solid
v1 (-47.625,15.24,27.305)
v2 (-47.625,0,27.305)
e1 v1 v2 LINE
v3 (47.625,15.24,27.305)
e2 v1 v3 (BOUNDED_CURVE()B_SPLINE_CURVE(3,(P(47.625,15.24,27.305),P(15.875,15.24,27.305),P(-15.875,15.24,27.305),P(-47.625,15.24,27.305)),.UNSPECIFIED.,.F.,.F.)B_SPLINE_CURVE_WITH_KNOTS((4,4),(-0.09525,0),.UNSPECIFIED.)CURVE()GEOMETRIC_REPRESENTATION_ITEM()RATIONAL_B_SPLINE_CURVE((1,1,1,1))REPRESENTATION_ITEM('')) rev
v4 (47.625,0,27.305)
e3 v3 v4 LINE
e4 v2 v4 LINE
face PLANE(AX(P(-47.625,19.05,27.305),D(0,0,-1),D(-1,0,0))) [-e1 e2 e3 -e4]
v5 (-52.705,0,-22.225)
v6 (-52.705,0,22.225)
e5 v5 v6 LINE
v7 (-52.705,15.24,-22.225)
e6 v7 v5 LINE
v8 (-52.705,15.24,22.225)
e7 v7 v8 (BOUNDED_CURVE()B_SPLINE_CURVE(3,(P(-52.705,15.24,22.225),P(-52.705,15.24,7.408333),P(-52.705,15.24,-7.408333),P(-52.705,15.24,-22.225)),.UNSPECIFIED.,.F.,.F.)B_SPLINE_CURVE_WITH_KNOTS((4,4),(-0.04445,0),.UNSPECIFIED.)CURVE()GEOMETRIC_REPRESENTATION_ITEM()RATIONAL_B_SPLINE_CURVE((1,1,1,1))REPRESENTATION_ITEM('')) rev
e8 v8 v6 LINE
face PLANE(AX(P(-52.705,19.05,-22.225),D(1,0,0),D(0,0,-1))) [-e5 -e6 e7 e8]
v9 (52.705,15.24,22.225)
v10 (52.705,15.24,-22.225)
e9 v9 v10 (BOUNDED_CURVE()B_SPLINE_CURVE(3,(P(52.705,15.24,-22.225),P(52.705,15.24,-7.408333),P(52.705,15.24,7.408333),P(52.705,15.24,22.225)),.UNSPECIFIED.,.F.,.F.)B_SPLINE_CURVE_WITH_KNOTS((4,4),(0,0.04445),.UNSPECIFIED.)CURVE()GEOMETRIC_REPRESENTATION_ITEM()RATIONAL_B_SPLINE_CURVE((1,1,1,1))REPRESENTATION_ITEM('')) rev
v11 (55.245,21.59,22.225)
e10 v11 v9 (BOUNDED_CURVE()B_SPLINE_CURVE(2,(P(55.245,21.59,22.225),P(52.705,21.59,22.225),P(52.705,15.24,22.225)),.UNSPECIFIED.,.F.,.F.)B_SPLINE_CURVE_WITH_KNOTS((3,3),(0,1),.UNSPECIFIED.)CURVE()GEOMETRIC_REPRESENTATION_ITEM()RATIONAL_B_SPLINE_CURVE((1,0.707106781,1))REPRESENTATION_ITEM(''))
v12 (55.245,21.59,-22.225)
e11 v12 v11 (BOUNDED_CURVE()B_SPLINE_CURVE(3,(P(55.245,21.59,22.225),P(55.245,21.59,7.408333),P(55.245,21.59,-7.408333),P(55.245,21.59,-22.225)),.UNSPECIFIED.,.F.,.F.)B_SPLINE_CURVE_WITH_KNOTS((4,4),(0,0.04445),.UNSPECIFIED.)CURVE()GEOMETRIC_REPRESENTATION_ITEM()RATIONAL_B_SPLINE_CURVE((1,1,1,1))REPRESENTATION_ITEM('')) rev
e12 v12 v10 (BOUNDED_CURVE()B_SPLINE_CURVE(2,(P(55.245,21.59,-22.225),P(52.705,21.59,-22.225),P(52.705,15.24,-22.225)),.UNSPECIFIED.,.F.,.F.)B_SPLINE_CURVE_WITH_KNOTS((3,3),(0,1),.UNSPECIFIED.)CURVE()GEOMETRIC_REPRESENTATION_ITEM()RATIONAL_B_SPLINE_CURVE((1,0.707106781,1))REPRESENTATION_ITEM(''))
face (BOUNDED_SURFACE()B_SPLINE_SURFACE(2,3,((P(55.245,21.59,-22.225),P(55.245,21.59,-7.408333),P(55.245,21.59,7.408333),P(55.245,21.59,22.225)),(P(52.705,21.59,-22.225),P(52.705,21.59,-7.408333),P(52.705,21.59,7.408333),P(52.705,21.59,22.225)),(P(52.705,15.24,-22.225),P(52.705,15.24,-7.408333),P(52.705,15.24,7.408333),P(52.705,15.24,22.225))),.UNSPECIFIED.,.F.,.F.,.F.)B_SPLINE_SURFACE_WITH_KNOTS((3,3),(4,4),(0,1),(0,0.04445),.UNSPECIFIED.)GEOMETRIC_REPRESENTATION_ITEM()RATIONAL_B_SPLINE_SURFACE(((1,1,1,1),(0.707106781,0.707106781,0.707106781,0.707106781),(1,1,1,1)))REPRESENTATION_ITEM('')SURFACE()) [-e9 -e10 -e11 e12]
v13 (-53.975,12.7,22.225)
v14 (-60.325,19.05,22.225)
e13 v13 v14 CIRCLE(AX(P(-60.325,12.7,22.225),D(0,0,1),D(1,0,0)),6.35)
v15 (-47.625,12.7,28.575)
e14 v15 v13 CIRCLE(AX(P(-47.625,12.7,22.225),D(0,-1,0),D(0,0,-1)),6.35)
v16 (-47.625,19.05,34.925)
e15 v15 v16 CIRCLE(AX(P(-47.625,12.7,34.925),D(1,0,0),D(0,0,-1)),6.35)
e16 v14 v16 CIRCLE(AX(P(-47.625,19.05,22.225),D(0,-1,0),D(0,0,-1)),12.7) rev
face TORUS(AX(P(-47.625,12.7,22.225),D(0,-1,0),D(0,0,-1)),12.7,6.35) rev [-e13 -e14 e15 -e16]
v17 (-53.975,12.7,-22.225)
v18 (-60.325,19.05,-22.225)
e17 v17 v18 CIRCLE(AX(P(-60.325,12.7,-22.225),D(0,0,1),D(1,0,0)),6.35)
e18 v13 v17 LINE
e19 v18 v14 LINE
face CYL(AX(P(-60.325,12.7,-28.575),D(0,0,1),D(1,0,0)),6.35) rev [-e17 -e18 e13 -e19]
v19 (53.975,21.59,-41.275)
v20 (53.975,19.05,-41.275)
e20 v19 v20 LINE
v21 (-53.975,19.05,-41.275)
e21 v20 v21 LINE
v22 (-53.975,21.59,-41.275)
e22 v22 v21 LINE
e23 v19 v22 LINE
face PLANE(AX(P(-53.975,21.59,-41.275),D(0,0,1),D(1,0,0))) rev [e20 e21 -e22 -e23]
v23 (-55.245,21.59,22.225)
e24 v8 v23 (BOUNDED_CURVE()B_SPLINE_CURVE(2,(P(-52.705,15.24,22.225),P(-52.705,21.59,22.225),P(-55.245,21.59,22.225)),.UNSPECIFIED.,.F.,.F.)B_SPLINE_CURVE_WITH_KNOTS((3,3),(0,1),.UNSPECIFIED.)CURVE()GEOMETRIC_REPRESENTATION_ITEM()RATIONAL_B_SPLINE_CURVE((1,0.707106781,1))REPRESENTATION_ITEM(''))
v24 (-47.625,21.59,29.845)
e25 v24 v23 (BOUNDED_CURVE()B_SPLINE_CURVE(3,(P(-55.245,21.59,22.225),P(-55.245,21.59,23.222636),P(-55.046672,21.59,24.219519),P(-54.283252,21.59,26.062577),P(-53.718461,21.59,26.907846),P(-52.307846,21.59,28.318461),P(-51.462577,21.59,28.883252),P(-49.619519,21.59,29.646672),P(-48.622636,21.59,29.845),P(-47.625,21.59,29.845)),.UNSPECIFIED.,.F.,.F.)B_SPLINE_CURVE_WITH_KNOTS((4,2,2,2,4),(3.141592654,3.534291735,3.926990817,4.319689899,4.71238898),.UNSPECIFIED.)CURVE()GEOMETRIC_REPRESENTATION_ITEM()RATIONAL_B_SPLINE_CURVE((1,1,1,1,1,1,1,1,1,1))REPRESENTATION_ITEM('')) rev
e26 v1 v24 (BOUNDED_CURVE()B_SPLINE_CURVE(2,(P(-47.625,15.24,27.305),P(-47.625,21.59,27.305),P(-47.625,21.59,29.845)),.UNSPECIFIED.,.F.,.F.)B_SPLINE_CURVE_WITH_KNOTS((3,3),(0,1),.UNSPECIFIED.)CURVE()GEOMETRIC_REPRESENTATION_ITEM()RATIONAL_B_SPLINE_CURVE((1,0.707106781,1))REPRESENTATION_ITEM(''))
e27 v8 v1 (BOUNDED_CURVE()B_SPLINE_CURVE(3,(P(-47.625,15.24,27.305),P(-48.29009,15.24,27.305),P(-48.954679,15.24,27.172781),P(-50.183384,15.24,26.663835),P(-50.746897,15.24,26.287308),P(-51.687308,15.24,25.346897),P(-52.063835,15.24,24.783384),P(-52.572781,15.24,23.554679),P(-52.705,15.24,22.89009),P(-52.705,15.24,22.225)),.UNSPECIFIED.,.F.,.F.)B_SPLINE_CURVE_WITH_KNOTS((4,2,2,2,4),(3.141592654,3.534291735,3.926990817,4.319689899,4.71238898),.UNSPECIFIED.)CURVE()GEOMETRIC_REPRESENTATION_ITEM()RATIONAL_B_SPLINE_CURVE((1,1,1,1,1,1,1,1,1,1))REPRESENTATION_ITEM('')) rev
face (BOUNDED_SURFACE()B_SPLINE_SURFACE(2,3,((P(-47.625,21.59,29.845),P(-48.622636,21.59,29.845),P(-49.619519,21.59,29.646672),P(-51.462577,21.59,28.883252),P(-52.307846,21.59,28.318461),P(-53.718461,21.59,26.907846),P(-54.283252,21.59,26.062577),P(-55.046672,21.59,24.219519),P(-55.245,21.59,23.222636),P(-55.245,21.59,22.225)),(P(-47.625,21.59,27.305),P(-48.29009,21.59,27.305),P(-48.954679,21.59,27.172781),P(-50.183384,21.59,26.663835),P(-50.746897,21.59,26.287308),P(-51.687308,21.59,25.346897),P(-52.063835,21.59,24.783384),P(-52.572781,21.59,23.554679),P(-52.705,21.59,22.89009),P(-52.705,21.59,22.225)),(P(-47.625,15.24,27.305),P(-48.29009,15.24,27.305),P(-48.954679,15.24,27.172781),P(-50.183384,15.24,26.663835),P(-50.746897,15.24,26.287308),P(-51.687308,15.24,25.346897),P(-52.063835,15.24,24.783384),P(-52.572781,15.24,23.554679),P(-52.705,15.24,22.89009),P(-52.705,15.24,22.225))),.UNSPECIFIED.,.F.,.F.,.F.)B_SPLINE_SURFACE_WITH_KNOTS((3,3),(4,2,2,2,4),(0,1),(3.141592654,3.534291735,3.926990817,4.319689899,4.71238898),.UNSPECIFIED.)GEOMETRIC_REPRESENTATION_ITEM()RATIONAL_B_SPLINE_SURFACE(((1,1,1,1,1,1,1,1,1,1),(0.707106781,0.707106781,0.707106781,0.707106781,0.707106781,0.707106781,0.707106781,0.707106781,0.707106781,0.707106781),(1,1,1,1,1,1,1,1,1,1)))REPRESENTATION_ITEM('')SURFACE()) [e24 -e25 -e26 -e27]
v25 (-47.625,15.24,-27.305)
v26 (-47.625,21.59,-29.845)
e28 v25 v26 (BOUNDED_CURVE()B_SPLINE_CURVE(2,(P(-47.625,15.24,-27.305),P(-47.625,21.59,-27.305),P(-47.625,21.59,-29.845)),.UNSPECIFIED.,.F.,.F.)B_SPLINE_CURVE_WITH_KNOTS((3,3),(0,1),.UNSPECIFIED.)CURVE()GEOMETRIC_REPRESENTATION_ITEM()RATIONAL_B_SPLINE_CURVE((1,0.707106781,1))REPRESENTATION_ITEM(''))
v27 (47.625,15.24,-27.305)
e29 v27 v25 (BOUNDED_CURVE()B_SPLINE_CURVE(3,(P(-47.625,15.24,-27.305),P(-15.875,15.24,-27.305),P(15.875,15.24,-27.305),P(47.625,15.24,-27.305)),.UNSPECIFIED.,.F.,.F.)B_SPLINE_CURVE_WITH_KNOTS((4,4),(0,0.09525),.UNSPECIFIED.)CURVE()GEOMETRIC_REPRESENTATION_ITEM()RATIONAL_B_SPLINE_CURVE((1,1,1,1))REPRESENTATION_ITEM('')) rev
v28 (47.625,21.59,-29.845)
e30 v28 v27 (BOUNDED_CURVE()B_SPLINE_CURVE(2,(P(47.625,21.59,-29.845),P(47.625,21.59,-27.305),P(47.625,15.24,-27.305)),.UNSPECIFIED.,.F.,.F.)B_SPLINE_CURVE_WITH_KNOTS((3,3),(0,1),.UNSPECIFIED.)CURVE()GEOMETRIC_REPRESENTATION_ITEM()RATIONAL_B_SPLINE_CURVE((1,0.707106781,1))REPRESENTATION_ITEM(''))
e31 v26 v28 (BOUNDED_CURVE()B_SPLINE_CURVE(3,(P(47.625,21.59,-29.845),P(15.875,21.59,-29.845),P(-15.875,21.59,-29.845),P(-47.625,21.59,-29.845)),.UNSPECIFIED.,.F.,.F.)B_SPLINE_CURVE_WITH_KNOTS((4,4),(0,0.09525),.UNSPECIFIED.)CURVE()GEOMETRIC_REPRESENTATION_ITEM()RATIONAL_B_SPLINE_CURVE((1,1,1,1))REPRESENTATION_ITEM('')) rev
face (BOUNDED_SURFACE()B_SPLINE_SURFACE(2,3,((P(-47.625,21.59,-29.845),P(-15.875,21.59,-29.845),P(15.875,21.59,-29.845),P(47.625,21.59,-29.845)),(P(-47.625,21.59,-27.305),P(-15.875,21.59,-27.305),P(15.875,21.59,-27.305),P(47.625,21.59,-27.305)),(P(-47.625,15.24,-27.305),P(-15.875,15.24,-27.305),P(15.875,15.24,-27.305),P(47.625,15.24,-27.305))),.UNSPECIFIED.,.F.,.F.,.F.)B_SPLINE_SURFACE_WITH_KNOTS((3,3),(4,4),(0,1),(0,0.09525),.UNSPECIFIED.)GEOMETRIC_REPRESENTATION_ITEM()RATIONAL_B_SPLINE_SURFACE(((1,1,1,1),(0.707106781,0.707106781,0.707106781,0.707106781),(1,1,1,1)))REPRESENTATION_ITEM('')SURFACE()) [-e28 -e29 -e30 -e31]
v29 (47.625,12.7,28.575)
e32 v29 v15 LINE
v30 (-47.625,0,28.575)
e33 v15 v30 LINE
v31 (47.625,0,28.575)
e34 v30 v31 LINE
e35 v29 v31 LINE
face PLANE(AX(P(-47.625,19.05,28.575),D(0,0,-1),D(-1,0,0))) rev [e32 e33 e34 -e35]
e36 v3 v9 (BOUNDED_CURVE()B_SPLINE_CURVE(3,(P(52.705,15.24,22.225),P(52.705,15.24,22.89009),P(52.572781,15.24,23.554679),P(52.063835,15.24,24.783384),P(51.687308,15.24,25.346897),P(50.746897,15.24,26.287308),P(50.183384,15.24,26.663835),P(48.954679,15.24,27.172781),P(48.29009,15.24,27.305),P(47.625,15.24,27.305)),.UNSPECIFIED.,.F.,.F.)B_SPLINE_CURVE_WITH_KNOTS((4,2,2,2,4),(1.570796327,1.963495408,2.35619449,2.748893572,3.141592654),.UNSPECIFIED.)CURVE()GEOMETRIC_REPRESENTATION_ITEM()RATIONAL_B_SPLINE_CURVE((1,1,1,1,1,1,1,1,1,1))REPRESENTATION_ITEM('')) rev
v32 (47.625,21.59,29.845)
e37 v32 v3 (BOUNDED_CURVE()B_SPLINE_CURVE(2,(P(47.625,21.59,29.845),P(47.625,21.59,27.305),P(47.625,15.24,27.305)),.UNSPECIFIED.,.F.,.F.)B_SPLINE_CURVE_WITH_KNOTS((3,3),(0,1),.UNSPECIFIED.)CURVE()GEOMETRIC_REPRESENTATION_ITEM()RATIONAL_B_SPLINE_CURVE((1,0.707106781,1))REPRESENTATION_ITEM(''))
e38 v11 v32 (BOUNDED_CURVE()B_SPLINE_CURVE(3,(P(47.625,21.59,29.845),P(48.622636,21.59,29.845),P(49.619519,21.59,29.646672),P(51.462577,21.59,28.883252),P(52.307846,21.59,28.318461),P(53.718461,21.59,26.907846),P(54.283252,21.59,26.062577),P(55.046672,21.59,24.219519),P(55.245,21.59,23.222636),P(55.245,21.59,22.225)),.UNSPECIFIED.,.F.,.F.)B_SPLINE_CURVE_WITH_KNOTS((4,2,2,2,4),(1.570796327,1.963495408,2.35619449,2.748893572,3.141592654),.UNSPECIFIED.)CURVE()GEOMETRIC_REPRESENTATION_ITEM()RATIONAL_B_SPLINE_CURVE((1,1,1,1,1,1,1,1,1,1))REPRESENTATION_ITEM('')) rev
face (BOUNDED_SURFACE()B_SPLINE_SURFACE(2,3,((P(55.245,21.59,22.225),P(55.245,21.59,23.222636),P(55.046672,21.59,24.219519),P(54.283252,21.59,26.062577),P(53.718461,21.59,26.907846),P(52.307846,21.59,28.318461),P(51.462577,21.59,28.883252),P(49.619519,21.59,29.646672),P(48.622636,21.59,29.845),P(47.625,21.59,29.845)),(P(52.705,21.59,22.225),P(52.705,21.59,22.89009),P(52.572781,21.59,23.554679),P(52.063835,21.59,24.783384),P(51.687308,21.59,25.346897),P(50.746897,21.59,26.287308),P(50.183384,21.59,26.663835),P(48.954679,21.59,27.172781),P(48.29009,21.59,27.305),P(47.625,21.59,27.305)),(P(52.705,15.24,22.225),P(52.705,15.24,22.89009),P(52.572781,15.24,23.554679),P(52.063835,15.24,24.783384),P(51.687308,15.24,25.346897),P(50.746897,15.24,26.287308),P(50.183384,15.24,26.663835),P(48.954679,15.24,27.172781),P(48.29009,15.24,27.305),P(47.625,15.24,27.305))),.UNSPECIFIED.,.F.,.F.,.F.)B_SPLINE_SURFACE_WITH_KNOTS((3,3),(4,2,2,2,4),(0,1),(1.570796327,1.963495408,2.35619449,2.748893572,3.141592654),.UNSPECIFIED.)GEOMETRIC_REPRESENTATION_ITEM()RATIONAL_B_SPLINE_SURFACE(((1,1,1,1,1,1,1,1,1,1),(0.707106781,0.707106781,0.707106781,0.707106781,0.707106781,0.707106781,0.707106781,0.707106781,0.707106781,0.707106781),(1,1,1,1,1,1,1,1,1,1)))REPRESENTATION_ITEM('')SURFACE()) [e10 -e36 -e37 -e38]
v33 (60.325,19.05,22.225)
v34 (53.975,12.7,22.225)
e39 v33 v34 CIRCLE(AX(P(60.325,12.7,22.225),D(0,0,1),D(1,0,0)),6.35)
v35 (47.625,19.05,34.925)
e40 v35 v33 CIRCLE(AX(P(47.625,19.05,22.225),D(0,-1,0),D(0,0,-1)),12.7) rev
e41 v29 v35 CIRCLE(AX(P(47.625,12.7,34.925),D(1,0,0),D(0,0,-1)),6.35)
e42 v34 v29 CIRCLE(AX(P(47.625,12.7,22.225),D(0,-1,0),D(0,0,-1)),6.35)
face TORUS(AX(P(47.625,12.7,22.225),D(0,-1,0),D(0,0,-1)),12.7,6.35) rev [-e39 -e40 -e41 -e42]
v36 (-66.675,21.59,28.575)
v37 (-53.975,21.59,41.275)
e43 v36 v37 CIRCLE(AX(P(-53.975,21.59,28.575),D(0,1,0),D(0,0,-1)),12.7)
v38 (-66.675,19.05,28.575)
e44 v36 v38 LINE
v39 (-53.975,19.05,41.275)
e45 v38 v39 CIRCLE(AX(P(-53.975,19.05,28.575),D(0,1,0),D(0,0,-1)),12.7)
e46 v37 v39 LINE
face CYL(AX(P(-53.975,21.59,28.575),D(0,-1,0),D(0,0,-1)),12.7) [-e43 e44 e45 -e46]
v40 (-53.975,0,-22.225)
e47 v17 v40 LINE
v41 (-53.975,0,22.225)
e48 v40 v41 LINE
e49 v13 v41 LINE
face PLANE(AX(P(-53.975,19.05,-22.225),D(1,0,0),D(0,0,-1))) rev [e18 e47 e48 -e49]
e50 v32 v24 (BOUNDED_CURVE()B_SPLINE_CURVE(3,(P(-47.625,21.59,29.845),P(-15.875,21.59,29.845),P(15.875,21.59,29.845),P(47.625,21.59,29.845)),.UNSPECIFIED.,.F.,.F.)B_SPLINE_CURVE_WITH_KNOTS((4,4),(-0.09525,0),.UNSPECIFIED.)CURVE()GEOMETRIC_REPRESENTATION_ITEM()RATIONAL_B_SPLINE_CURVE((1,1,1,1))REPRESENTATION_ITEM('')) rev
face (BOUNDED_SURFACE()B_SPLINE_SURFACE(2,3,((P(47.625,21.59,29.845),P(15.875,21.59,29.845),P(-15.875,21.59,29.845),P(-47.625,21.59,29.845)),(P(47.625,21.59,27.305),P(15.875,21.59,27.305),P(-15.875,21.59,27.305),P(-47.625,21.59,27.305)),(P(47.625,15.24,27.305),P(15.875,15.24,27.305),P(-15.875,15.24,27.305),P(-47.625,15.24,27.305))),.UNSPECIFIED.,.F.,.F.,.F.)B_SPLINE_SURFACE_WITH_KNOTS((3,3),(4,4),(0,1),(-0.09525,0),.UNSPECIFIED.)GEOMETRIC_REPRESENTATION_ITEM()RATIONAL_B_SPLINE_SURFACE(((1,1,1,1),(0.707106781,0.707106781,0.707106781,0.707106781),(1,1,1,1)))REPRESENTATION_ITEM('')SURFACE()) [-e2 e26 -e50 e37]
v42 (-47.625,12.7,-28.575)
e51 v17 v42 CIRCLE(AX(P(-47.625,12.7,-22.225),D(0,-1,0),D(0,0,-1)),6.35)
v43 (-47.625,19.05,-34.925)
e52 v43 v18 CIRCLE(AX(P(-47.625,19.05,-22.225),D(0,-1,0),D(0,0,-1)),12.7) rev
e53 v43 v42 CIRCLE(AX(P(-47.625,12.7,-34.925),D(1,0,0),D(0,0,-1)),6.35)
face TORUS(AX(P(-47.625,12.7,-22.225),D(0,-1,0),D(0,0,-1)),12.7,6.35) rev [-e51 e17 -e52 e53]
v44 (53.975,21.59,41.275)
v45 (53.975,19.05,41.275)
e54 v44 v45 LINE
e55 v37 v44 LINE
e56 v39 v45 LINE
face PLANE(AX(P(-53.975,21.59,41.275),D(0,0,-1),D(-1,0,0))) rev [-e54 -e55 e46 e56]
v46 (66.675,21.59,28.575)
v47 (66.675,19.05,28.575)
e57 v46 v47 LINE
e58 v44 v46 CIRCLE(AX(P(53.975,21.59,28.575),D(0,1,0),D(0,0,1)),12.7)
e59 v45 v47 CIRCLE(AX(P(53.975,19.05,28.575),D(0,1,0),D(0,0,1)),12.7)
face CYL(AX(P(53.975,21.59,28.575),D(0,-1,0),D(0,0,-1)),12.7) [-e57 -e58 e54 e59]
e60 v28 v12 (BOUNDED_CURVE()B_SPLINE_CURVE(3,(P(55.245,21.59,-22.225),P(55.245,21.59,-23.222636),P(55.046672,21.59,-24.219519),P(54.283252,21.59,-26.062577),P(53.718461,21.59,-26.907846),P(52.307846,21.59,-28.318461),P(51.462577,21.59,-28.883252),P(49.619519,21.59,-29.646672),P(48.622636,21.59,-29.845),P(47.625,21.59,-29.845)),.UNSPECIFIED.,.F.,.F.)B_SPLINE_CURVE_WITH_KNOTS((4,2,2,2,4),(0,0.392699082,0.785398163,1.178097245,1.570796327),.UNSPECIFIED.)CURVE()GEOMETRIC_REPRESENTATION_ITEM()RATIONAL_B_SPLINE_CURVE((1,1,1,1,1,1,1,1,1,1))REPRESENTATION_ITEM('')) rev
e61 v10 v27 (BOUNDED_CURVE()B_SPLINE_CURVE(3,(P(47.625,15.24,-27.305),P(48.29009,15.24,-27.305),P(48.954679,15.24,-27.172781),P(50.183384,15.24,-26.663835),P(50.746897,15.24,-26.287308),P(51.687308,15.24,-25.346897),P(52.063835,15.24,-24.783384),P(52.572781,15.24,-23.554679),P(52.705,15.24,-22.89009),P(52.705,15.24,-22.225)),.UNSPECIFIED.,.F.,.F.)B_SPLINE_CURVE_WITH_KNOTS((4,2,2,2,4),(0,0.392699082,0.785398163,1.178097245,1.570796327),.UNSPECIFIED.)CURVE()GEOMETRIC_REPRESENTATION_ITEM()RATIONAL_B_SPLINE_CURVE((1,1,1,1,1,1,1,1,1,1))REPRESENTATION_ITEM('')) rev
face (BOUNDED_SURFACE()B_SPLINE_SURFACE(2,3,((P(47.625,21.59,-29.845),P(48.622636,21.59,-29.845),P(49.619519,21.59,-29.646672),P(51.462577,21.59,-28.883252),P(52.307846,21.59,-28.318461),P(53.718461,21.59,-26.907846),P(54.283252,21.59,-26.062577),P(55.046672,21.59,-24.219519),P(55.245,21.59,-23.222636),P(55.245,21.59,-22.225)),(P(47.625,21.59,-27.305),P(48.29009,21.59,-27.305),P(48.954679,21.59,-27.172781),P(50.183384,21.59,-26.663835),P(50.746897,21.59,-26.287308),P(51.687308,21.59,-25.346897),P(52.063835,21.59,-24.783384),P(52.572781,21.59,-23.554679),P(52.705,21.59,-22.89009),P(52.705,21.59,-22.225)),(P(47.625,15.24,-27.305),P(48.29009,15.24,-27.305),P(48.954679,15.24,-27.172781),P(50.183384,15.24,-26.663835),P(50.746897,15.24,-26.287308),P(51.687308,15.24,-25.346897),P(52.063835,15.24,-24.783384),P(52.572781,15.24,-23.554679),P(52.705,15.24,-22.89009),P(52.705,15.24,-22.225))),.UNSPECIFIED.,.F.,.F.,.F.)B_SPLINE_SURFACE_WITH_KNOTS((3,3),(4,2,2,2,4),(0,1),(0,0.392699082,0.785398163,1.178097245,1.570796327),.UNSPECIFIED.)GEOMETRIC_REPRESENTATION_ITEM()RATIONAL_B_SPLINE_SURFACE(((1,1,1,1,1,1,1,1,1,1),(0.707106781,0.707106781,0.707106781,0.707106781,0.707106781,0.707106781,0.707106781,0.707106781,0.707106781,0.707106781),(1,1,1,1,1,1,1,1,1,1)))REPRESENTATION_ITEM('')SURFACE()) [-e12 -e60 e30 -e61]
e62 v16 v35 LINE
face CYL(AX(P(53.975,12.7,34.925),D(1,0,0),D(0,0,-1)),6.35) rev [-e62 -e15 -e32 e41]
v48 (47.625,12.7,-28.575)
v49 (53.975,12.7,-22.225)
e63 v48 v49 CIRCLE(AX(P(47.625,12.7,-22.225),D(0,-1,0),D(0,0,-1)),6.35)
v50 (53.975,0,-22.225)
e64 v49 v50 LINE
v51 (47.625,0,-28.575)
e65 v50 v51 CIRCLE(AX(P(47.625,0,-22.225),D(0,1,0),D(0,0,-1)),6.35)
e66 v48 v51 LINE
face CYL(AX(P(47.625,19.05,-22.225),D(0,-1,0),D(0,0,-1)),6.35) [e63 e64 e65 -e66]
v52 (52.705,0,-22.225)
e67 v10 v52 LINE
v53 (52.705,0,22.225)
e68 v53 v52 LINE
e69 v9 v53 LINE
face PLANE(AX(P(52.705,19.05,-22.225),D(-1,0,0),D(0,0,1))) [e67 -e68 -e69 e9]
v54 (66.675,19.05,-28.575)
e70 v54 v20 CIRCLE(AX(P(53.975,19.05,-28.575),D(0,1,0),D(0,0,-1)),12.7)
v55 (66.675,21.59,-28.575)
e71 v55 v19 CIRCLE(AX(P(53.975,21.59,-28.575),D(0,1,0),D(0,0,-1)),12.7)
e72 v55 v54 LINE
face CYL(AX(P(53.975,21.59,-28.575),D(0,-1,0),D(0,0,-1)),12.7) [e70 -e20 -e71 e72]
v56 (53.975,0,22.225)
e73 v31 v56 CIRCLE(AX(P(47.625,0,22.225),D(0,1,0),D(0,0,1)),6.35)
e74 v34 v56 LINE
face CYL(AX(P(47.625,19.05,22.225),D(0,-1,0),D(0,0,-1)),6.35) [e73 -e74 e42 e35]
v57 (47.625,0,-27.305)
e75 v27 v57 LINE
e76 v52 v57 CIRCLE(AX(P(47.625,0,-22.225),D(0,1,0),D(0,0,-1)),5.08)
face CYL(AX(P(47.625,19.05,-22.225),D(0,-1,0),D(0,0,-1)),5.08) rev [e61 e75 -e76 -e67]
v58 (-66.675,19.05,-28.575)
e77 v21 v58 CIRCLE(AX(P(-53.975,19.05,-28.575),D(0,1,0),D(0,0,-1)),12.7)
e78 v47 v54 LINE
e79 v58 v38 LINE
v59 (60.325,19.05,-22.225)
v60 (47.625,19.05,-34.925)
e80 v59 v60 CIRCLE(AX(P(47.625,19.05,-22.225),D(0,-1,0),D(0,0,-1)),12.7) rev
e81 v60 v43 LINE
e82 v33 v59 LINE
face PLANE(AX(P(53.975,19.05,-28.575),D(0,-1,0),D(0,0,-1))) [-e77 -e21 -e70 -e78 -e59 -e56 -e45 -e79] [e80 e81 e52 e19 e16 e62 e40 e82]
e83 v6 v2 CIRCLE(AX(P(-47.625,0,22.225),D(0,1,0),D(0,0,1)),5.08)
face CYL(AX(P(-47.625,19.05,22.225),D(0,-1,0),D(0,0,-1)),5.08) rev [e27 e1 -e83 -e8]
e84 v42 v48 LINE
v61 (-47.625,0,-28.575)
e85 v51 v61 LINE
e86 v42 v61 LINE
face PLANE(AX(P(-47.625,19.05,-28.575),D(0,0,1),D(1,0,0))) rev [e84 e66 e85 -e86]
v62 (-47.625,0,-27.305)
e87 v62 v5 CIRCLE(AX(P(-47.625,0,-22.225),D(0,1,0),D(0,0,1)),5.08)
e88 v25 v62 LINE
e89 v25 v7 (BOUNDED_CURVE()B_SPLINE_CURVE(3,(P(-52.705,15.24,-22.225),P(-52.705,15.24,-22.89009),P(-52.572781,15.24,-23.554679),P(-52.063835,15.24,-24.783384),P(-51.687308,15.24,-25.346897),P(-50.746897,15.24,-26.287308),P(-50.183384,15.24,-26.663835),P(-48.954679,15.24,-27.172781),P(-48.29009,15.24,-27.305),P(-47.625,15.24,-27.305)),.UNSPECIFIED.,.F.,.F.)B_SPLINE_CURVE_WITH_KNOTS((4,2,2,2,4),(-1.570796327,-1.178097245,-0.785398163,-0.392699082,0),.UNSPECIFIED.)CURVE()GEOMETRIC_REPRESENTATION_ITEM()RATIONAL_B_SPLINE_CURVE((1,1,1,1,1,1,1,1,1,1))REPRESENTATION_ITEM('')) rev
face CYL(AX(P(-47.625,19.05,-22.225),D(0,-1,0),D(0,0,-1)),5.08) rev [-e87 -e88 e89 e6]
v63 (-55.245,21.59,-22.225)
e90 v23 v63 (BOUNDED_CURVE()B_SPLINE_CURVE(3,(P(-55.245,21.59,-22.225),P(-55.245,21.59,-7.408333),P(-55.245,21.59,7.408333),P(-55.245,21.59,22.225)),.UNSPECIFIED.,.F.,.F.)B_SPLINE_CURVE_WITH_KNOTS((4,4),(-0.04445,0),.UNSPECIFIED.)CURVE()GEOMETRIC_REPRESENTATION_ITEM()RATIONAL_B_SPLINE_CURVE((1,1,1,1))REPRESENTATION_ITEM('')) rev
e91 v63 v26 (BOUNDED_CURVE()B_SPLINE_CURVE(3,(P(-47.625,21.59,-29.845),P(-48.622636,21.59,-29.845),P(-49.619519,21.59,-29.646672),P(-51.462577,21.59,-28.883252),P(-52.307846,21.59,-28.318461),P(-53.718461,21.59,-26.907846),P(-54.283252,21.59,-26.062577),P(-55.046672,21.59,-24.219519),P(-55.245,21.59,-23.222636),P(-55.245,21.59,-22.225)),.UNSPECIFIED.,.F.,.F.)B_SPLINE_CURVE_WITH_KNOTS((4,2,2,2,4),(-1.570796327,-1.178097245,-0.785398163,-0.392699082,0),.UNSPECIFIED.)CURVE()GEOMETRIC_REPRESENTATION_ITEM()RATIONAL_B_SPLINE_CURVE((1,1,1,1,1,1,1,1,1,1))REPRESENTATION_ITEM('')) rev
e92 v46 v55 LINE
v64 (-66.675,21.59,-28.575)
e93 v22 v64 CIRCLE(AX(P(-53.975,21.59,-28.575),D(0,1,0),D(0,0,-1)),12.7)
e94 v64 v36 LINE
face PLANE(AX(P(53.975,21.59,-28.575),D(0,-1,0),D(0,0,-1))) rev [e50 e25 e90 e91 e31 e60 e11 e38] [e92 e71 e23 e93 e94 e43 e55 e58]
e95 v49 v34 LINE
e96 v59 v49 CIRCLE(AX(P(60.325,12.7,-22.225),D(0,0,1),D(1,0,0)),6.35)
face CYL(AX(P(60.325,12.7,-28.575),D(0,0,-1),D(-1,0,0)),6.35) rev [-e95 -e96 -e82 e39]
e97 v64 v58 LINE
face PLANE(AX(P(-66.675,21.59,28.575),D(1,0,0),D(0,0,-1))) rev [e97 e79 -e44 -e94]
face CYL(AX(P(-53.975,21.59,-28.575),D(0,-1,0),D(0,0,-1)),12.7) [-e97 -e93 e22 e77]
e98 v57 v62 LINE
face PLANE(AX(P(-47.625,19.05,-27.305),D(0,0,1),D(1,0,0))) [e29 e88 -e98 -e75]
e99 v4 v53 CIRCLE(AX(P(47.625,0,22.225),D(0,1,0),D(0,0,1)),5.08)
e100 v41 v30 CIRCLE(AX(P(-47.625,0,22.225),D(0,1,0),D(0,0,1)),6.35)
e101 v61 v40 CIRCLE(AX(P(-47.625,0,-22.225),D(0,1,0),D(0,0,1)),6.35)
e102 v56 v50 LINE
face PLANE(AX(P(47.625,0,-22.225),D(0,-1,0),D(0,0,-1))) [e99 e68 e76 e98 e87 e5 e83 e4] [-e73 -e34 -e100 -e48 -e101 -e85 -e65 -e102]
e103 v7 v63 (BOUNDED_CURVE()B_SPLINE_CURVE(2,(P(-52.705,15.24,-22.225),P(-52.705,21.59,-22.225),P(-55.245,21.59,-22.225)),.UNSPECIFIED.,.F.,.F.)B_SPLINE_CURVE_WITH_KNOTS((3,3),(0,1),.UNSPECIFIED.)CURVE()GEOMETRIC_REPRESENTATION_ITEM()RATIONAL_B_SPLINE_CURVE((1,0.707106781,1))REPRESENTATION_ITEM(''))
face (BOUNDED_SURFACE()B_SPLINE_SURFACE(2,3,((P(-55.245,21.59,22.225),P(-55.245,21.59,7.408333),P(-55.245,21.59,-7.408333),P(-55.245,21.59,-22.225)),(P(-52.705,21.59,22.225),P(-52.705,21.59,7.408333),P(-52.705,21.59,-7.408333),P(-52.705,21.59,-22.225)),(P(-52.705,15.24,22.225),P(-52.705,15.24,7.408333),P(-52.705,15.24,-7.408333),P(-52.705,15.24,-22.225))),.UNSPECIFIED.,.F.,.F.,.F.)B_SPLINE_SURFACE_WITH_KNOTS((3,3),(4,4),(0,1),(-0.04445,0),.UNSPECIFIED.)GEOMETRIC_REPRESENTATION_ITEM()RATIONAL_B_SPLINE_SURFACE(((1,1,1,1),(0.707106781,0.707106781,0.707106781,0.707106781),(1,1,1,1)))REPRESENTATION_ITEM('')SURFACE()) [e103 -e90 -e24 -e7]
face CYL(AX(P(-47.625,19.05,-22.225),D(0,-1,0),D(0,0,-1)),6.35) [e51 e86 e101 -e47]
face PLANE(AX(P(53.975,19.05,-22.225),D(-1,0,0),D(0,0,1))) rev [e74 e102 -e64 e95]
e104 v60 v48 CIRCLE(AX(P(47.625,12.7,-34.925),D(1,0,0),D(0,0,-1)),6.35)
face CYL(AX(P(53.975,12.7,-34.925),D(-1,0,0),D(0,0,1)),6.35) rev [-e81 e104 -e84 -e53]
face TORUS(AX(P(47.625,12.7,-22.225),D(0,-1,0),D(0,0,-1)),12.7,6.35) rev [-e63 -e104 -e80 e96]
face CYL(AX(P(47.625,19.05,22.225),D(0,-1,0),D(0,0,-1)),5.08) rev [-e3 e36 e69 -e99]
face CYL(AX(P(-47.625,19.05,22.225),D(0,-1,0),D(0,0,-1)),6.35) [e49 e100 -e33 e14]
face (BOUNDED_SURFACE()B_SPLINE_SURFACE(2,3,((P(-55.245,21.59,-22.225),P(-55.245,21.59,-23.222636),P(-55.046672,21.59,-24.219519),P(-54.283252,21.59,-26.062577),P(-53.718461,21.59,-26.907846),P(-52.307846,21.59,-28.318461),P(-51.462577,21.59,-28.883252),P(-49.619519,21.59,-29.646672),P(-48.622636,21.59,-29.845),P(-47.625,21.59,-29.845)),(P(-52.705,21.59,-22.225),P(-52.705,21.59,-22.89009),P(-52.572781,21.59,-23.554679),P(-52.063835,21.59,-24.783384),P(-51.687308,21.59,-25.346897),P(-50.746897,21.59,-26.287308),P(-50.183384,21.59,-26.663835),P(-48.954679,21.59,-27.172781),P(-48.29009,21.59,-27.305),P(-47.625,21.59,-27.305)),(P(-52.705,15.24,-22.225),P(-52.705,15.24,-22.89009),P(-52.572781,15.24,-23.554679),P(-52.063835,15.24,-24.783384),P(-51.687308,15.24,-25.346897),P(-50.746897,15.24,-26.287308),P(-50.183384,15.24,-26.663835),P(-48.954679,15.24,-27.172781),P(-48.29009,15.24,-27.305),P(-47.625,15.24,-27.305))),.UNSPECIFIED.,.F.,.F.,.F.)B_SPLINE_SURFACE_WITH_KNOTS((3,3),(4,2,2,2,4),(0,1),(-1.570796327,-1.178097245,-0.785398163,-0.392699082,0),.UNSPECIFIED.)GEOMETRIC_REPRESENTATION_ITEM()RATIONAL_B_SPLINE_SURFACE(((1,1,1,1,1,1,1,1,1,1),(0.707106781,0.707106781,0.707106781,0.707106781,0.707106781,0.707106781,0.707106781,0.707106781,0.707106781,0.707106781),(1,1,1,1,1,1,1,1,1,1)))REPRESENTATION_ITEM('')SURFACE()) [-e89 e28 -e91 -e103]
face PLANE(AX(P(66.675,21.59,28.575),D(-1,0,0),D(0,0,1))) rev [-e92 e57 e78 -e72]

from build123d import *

# Parameters (mm, degrees)
BOSS_EXTRUDE1_DEPTH = 19.05
BOSS_EXTRUDE2_DEPTH = 2.54
FILLET1_R           = 6.35
FILLET3_SIZE        = 6.35
FILLET3_SIZE_2      = 2.54


with BuildPart() as part:
    # Sketch1 → Boss-Extrude1 (new body)
    with BuildSketch(Plane(origin=(0, 0, 0), x_dir=(1, 0, 0), z_dir=(0, 1, 0))):
        with BuildLine():
            Line((-47.625, 28.575), (47.625, 28.575))
            ThreePointArc((47.625, 28.575), (52.115128061, 26.715128061), (53.975, 22.225))
            Line((53.975, 22.225), (53.975, -22.225))
            ThreePointArc((53.975, -22.225), (52.115128061, -26.715128061), (47.625, -28.575))
            Line((47.625, -28.575), (-47.625, -28.575))
            ThreePointArc((-47.625, -28.575), (-52.115128061, -26.715128061), (-53.975, -22.225))
            Line((-53.975, -22.225), (-53.975, 22.225))
            ThreePointArc((-53.975, 22.225), (-52.115128061, 26.715128061), (-47.625, 28.575))
        make_face()
        with BuildLine():
            Line((-52.705, 22.225), (-52.705, -22.225))
            ThreePointArc((-52.705, -22.225), (-51.217102448, -25.817102448), (-47.625, -27.305))
            Line((-47.625, -27.305), (47.625, -27.305))
            ThreePointArc((47.625, -27.305), (51.217102448, -25.817102448), (52.705, -22.225))
            Line((52.705, -22.225), (52.705, 22.225))
            ThreePointArc((52.705, 22.225), (51.217102448, 25.817102448), (47.625, 27.305))
            Line((47.625, 27.305), (-47.625, 27.305))
            ThreePointArc((-47.625, 27.305), (-51.217102448, 25.817102448), (-52.705, 22.225))
        make_face(mode=Mode.SUBTRACT)
    extrude(amount=BOSS_EXTRUDE1_DEPTH)

    # Sketch2 → Boss-Extrude2 (add)
    with BuildSketch(Plane(origin=(0, 19.05, 0), x_dir=(1, 0, 0), z_dir=(0, 1, 0))):
        with BuildLine():
            Line((-53.975, -41.275), (53.975, -41.275))
            ThreePointArc((53.975, -41.275), (62.955256121, -37.555256121), (66.675, -28.575))
            Line((66.675, -28.575), (66.675, 28.575))
            ThreePointArc((66.675, 28.575), (62.955256121, 37.555256121), (53.975, 41.275))
            Line((53.975, 41.275), (-53.975, 41.275))
            ThreePointArc((-53.975, 41.275), (-62.955256121, 37.555256121), (-66.675, 28.575))
            Line((-66.675, 28.575), (-66.675, -28.575))
            ThreePointArc((-66.675, -28.575), (-62.955256121, -37.555256121), (-53.975, -41.275))
        make_face()
        with BuildLine():
            Line((52.705, -22.225), (52.705, 22.225))
            ThreePointArc((52.705, 22.225), (51.217102448, 25.817102448), (47.625, 27.305))
            Line((47.625, 27.305), (-47.625, 27.305))
            ThreePointArc((-47.625, 27.305), (-51.217102448, 25.817102448), (-52.705, 22.225))
            Line((-52.705, 22.225), (-52.705, -22.225))
            ThreePointArc((-52.705, -22.225), (-51.217102448, -25.817102448), (-47.625, -27.305))
            Line((-47.625, -27.305), (47.625, -27.305))
            ThreePointArc((47.625, -27.305), (51.217102448, -25.817102448), (52.705, -22.225))
        make_face(mode=Mode.SUBTRACT)
    extrude(amount=BOSS_EXTRUDE2_DEPTH)

    # Fillet1
    fillet1_edges = [part.edges().sort_by_distance(p)[0] for p in [
        (-52.115128061, 19.05, -26.715128061),
        (-53.975, 19.05, 0),
        (-52.115128061, 19.05, 26.715128061),
        (0, 19.05, 28.575),
        (52.115128061, 19.05, 26.715128061),
        (53.975, 19.05, 0),
        (52.115128061, 19.05, -26.715128061),
        (0, 19.05, -28.575),
    ]]
    fillet(fillet1_edges, radius=FILLET1_R)

    # Fillet3
    # an asymmetric fillet: 6.35, 2.54 mm, written as the material it takes off along each edge
    with BuildSketch(Plane(origin=(47.625, 21.59, -22.225), x_dir=(1, 0, 0), z_dir=(0, 0, 1))) as fillet3_piece_1:
        with BuildLine():
            Bezier((5.08, -FILLET3_SIZE), (5.08, 0), (5.08 + FILLET3_SIZE_2, 0), weights=[1, 0.707106781, 1])
            Line((5.08 + FILLET3_SIZE_2, 0), (5.08, 0))
            Line((5.08, 0), (5.08, -FILLET3_SIZE))
        make_face()
    revolve(axis=Axis((47.625, 21.59, -22.225), (0, 1, 0)), revolution_arc=90, mode=Mode.SUBTRACT)
    with BuildSketch(Plane(origin=(52.705, 21.59, 22.225), x_dir=(0, -1, 0), z_dir=(0, 0, -1)), Plane(origin=(-52.705, 21.59, -22.225), x_dir=(0, -1, 0), z_dir=(0, 0, 1))) as fillet3_piece_2:
        with BuildLine():
            Bezier((FILLET3_SIZE, 0), (0, 0), (0, -FILLET3_SIZE_2), weights=[1, 0.707106781, 1])
            Line((0, -FILLET3_SIZE_2), (0, 0))
            Line((0, 0), (FILLET3_SIZE, 0))
        make_face()
    extrude(amount=44.45, mode=Mode.SUBTRACT)
    with BuildSketch(Plane(origin=(47.625, 21.59, 22.225), x_dir=(0, 0, 1), z_dir=(-1, 0, 0))) as fillet3_piece_3:
        with BuildLine():
            Bezier((5.08, -FILLET3_SIZE), (5.08, 0), (5.08 + FILLET3_SIZE_2, 0), weights=[1, 0.707106781, 1])
            Line((5.08 + FILLET3_SIZE_2, 0), (5.08, 0))
            Line((5.08, 0), (5.08, -FILLET3_SIZE))
        make_face()
    revolve(axis=Axis((47.625, 21.59, 22.225), (0, 1, 0)), revolution_arc=90, mode=Mode.SUBTRACT)
    with BuildSketch(Plane(origin=(-47.625, 21.59, 27.305), x_dir=(0, -1, 0), z_dir=(1, 0, 0)), Plane(origin=(47.625, 21.59, -27.305), x_dir=(0, -1, 0), z_dir=(-1, 0, 0))) as fillet3_piece_4:
        with BuildLine():
            Bezier((FILLET3_SIZE, 0), (0, 0), (0, -FILLET3_SIZE_2), weights=[1, 0.707106781, 1])
            Line((0, -FILLET3_SIZE_2), (0, 0))
            Line((0, 0), (FILLET3_SIZE, 0))
        make_face()
    extrude(amount=95.25, mode=Mode.SUBTRACT)
    with BuildSketch(Plane(origin=(-47.625, 21.59, 22.225), x_dir=(-1, 0, 0), z_dir=(0, 0, -1))) as fillet3_piece_5:
        with BuildLine():
            Bezier((5.08, -FILLET3_SIZE), (5.08, 0), (5.08 + FILLET3_SIZE_2, 0), weights=[1, 0.707106781, 1])
            Line((5.08 + FILLET3_SIZE_2, 0), (5.08, 0))
            Line((5.08, 0), (5.08, -FILLET3_SIZE))
        make_face()
    revolve(axis=Axis((-47.625, 21.59, 22.225), (0, 1, 0)), revolution_arc=90, mode=Mode.SUBTRACT)
    with BuildSketch(Plane(origin=(-47.625, 21.59, -22.225), x_dir=(0, 0, -1), z_dir=(1, 0, 0))) as fillet3_piece_6:
        with BuildLine():
            Bezier((5.08, -FILLET3_SIZE), (5.08, 0), (5.08 + FILLET3_SIZE_2, 0), weights=[1, 0.707106781, 1])
            Line((5.08 + FILLET3_SIZE_2, 0), (5.08, 0))
            Line((5.08, 0), (5.08, -FILLET3_SIZE))
        make_face()
    revolve(axis=Axis((-47.625, 21.59, -22.225), (0, 1, 0)), revolution_arc=90, mode=Mode.SUBTRACT)


solid = part.part
